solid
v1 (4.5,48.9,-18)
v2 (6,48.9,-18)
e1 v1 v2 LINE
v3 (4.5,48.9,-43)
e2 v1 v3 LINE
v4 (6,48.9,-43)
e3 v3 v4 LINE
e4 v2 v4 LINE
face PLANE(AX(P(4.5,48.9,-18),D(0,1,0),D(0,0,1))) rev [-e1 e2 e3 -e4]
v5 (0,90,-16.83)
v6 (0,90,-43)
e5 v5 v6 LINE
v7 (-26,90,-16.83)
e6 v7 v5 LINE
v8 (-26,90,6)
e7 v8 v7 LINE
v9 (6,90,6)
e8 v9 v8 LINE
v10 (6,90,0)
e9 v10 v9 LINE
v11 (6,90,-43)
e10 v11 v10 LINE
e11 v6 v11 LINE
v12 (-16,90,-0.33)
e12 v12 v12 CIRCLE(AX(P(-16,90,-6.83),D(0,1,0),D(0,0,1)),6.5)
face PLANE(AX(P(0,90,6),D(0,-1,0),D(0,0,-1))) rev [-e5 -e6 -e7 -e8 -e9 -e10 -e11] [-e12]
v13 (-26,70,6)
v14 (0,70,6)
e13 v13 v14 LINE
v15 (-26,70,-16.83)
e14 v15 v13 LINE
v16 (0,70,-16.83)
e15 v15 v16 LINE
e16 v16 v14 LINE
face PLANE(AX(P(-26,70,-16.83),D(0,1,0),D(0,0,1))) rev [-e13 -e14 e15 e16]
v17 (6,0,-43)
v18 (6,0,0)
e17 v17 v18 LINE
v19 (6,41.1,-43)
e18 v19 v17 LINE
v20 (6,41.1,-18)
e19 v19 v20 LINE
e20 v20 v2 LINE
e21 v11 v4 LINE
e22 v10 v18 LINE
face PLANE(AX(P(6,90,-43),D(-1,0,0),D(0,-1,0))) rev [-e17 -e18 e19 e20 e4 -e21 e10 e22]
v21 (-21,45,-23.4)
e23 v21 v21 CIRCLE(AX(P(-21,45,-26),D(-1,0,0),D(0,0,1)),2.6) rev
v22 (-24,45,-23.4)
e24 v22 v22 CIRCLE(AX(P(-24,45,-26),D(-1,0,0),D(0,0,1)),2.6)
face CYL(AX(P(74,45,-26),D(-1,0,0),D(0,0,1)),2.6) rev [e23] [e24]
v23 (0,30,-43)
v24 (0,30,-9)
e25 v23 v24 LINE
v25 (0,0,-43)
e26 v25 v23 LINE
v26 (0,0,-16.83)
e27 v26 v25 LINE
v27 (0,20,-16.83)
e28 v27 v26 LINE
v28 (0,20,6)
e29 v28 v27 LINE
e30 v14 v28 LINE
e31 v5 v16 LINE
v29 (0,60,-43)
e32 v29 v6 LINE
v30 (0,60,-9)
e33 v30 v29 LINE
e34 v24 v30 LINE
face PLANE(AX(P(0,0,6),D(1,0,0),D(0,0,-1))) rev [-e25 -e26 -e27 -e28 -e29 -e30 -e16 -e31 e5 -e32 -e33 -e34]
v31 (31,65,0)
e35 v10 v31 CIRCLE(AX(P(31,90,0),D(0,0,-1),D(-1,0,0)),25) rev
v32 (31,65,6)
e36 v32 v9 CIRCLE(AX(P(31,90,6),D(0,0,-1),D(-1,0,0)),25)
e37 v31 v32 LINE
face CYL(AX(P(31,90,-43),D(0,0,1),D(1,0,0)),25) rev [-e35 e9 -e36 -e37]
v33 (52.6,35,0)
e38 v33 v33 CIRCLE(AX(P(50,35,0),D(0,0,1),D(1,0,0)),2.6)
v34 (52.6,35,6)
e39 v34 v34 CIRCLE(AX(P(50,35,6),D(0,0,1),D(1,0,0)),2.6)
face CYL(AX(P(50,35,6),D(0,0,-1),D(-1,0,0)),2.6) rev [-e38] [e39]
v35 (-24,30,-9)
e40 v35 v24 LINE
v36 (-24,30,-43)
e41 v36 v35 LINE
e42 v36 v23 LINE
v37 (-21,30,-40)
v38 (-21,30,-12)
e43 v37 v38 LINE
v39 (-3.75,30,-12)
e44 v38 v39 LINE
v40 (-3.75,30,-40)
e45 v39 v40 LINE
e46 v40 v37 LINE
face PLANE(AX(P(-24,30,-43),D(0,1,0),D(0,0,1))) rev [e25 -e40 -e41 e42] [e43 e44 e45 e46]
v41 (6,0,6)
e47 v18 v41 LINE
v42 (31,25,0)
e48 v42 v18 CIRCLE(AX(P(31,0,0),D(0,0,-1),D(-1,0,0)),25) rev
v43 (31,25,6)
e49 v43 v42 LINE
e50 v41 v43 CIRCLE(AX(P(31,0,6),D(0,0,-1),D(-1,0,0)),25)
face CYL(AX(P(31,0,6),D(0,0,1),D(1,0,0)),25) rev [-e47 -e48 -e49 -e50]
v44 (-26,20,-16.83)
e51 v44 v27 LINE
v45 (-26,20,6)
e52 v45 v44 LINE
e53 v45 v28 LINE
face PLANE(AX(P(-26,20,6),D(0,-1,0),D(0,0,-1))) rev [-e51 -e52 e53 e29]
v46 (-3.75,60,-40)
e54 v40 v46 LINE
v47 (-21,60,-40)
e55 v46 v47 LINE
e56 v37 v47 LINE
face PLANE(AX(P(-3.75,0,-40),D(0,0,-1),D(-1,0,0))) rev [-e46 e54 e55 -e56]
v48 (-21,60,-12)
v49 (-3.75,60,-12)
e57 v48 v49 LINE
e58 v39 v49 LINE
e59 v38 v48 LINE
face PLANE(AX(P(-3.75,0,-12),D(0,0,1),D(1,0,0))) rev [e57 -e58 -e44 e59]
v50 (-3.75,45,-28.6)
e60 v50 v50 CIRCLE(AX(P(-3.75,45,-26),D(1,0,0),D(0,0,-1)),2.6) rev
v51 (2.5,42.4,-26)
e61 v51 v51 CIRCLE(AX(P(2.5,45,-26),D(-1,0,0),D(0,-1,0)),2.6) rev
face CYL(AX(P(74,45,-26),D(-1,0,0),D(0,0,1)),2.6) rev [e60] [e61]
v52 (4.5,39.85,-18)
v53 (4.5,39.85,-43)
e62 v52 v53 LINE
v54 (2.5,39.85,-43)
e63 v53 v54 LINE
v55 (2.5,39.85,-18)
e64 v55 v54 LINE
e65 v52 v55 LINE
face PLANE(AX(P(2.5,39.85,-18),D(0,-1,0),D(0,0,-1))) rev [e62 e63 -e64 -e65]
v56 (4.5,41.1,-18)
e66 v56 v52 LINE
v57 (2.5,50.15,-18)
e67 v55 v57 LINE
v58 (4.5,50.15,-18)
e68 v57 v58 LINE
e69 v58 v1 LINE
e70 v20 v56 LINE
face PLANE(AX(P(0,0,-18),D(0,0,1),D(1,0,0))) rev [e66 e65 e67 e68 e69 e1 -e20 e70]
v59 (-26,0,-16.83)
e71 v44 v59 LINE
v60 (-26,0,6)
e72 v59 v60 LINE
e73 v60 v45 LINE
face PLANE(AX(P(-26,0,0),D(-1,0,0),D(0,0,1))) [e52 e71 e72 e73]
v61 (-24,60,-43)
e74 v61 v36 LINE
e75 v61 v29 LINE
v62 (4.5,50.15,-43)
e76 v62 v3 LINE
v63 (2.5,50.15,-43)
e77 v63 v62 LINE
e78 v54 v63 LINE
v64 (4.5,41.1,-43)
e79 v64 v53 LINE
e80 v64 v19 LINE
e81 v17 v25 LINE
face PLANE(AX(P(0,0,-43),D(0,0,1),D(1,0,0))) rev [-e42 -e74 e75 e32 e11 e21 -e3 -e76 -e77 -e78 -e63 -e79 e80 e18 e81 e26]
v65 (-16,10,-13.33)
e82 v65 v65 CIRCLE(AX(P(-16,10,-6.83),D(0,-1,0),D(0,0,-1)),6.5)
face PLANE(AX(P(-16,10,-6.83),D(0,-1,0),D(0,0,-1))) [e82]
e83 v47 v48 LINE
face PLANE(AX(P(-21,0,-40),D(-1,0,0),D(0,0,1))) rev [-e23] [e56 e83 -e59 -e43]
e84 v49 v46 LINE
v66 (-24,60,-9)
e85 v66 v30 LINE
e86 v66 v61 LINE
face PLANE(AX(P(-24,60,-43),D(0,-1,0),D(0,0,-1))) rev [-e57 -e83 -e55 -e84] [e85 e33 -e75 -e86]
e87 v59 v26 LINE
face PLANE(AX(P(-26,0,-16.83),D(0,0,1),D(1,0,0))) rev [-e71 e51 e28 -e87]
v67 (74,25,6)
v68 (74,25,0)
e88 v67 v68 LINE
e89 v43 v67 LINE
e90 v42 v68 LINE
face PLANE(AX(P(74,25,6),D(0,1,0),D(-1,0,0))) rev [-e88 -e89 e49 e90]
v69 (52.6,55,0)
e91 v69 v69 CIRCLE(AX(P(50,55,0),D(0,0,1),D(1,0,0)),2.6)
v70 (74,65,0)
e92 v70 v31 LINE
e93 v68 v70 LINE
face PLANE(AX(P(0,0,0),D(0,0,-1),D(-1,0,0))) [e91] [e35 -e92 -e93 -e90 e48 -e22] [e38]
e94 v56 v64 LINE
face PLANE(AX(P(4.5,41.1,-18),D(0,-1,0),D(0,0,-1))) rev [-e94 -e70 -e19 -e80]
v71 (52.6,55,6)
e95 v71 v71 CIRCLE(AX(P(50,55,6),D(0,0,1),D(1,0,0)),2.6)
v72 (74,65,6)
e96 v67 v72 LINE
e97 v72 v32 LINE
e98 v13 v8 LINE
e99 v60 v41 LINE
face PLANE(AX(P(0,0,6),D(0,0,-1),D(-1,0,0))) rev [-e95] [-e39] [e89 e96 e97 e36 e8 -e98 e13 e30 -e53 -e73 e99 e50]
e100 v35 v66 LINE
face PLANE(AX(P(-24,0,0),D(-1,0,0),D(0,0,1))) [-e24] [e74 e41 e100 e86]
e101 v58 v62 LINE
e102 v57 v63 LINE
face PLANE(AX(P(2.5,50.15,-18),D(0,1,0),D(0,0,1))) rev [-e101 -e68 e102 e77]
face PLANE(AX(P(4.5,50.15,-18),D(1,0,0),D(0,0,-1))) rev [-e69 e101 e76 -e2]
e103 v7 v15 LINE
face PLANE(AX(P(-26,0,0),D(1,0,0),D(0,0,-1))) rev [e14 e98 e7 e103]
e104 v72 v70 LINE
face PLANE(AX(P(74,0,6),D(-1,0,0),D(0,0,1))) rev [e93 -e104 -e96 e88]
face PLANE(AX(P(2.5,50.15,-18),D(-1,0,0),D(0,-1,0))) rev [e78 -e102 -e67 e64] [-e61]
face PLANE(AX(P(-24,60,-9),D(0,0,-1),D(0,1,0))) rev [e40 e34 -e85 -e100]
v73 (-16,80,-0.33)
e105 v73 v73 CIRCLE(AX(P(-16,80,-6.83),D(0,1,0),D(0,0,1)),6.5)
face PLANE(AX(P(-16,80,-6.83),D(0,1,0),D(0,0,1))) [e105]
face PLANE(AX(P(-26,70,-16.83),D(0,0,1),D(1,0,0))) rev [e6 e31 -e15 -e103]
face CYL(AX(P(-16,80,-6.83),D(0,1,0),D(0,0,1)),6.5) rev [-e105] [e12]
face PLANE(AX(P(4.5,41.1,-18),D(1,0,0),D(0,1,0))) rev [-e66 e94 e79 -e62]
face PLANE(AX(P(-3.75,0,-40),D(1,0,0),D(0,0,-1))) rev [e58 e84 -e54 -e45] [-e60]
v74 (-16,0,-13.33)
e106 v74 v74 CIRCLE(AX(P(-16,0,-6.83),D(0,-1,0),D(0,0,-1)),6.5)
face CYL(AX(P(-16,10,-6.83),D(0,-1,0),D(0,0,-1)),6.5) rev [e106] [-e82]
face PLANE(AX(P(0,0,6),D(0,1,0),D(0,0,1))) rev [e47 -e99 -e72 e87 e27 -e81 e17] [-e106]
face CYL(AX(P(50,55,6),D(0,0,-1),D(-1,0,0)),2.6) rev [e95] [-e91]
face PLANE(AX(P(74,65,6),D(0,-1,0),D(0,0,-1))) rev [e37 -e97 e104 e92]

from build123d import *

# Parameters (mm, degrees)
SKETCH1_W               = 74
SKETCH1_H               = 90
SKETCH1_R               = 2.6
BOSS_EXTRUDE1_DEPTH     = 6
SKETCH2_W               = 6
SKETCH2_H               = 90
BOSS_EXTRUDE2_DEPTH     = 43
SKETCH4_W               = 68
SKETCH4_H               = 25
CUT_EXTRUDE3_DEPTH      = 6
FILLET2_R               = 25
SKETCH5_W               = 34
SKETCH5_H               = 30
BOSS_EXTRUDE3_DEPTH     = 24
CUT_EXTRUDE1_DEPTH      = 125.197423484
CUT_EXTRUDE1_DEPTH_BACK = 125.197423484
SKETCH3_R               = 2.6
SKETCH6_W               = 17.25
SKETCH6_H               = 28
CUT_EXTRUDE4_DEPTH      = 105.522724802
CUT_EXTRUDE5_DEPTH      = 25
SKETCH8_W               = 22.83
SKETCH8_H               = 20
BOSS_EXTRUDE4_DEPTH     = 26
SKETCH9_R               = 6.5
CUT_EXTRUDE6_DEPTH      = 10
CUT_EXTRUDE7_START      = -10
SKETCH10_R              = 6.5
CUT_EXTRUDE7_DEPTH      = 10


with BuildPart() as part:
    # Sketch1 → Boss-Extrude1 (new body)
    with BuildSketch(Plane.XY):
        with Locations((37, 45)):
            Rectangle(SKETCH1_W, SKETCH1_H)
        with Locations((50, 55)):
            Circle(SKETCH1_R, mode=Mode.SUBTRACT)
        with Locations((50, 35)):
            Circle(SKETCH1_R, mode=Mode.SUBTRACT)
    extrude(amount=BOSS_EXTRUDE1_DEPTH)

    # Sketch2 → Boss-Extrude2 (add)
    with BuildSketch(Plane(origin=(0, 0, 0), x_dir=(-1, 0, 0), z_dir=(0, 0, -1))):
        with Locations((-3, 45)):
            Rectangle(SKETCH2_W, SKETCH2_H)
    extrude(amount=BOSS_EXTRUDE2_DEPTH)

    # Sketch4 → Cut-Extrude3 (cut)
    with BuildSketch(Plane(origin=(0, 0, 0), x_dir=(-1, 0, 0), z_dir=(0, 0, -1))):
        with Locations((-40, 77.5)):
            Rectangle(SKETCH4_W, SKETCH4_H)
        with Locations((-40, 12.5)):
            Rectangle(SKETCH4_W, SKETCH4_H)
    extrude(amount=-CUT_EXTRUDE3_DEPTH, mode=Mode.SUBTRACT)

    # Fillet2
    fillet2_edges = [part.edges().sort_by_distance(p)[0] for p in [
        (6, 65, 3),
        (6, 25, 3),
    ]]
    fillet(fillet2_edges, radius=FILLET2_R - 0.0001)  # a hair under: the kernel refuses the full size

    # Sketch5 → Boss-Extrude3 (add)
    with BuildSketch(Plane.ZY):
        with Locations((-26, 45)):
            Rectangle(SKETCH5_W, SKETCH5_H)
    extrude(amount=BOSS_EXTRUDE3_DEPTH)

    # Sketch3 → Cut-Extrude1 (cut, two sides: drawn at the far end of the back side and taken through both)
    with BuildSketch(Plane.ZY.offset(-CUT_EXTRUDE1_DEPTH_BACK)):
        with Locations((-26, 45)):
            Circle(SKETCH3_R)
    extrude(amount=CUT_EXTRUDE1_DEPTH + CUT_EXTRUDE1_DEPTH_BACK, mode=Mode.SUBTRACT)

    # Sketch6 → Cut-Extrude4 (cut, through all)
    with BuildSketch(Plane(origin=(0, 60, 0), x_dir=(1, 0, 0), z_dir=(0, 1, 0))):
        with Locations((-12.375, 26)):
            Rectangle(SKETCH6_W, SKETCH6_H)
    extrude(amount=-CUT_EXTRUDE4_DEPTH, mode=Mode.SUBTRACT)

    # Sketch7 → Cut-Extrude5 (cut)
    with BuildSketch(Plane(origin=(0, 0, -43), x_dir=(-1, 0, 0), z_dir=(0, 0, -1))):
        Polygon((-2.5, 50.15), (-4.5, 50.15), (-4.5, 48.9), (-7.5, 48.9), (-7.5, 41.1), (-4.5, 41.1), (-4.5, 39.85), (-2.5, 39.85), align=None)
    extrude(amount=-CUT_EXTRUDE5_DEPTH, mode=Mode.SUBTRACT)

    # Sketch8 → Boss-Extrude4 (add)
    with BuildSketch(Plane.ZY):
        with Locations((-5.415, 10)):
            Rectangle(SKETCH8_W, SKETCH8_H)
        with Locations((-5.415, 80)):
            Rectangle(SKETCH8_W, SKETCH8_H)
    extrude(amount=BOSS_EXTRUDE4_DEPTH)

    # Sketch9 → Cut-Extrude6 (cut)
    with BuildSketch(Plane.XZ):
        with Locations(Location((-16, -6.83, 0), (0, 0, 270))):
            Circle(SKETCH9_R)
    extrude(amount=-CUT_EXTRUDE6_DEPTH, mode=Mode.SUBTRACT)

    # Sketch10 → Cut-Extrude7 (cut)
    with BuildSketch(Plane(origin=(0, 90, 0), x_dir=(1, 0, 0), z_dir=(0, 1, 0)).offset(CUT_EXTRUDE7_START)):
        with Locations(Location((-16, 6.83, 0), (0, 0, 90))):
            Circle(SKETCH10_R)
    extrude(amount=CUT_EXTRUDE7_DEPTH, mode=Mode.SUBTRACT)


solid = part.part
